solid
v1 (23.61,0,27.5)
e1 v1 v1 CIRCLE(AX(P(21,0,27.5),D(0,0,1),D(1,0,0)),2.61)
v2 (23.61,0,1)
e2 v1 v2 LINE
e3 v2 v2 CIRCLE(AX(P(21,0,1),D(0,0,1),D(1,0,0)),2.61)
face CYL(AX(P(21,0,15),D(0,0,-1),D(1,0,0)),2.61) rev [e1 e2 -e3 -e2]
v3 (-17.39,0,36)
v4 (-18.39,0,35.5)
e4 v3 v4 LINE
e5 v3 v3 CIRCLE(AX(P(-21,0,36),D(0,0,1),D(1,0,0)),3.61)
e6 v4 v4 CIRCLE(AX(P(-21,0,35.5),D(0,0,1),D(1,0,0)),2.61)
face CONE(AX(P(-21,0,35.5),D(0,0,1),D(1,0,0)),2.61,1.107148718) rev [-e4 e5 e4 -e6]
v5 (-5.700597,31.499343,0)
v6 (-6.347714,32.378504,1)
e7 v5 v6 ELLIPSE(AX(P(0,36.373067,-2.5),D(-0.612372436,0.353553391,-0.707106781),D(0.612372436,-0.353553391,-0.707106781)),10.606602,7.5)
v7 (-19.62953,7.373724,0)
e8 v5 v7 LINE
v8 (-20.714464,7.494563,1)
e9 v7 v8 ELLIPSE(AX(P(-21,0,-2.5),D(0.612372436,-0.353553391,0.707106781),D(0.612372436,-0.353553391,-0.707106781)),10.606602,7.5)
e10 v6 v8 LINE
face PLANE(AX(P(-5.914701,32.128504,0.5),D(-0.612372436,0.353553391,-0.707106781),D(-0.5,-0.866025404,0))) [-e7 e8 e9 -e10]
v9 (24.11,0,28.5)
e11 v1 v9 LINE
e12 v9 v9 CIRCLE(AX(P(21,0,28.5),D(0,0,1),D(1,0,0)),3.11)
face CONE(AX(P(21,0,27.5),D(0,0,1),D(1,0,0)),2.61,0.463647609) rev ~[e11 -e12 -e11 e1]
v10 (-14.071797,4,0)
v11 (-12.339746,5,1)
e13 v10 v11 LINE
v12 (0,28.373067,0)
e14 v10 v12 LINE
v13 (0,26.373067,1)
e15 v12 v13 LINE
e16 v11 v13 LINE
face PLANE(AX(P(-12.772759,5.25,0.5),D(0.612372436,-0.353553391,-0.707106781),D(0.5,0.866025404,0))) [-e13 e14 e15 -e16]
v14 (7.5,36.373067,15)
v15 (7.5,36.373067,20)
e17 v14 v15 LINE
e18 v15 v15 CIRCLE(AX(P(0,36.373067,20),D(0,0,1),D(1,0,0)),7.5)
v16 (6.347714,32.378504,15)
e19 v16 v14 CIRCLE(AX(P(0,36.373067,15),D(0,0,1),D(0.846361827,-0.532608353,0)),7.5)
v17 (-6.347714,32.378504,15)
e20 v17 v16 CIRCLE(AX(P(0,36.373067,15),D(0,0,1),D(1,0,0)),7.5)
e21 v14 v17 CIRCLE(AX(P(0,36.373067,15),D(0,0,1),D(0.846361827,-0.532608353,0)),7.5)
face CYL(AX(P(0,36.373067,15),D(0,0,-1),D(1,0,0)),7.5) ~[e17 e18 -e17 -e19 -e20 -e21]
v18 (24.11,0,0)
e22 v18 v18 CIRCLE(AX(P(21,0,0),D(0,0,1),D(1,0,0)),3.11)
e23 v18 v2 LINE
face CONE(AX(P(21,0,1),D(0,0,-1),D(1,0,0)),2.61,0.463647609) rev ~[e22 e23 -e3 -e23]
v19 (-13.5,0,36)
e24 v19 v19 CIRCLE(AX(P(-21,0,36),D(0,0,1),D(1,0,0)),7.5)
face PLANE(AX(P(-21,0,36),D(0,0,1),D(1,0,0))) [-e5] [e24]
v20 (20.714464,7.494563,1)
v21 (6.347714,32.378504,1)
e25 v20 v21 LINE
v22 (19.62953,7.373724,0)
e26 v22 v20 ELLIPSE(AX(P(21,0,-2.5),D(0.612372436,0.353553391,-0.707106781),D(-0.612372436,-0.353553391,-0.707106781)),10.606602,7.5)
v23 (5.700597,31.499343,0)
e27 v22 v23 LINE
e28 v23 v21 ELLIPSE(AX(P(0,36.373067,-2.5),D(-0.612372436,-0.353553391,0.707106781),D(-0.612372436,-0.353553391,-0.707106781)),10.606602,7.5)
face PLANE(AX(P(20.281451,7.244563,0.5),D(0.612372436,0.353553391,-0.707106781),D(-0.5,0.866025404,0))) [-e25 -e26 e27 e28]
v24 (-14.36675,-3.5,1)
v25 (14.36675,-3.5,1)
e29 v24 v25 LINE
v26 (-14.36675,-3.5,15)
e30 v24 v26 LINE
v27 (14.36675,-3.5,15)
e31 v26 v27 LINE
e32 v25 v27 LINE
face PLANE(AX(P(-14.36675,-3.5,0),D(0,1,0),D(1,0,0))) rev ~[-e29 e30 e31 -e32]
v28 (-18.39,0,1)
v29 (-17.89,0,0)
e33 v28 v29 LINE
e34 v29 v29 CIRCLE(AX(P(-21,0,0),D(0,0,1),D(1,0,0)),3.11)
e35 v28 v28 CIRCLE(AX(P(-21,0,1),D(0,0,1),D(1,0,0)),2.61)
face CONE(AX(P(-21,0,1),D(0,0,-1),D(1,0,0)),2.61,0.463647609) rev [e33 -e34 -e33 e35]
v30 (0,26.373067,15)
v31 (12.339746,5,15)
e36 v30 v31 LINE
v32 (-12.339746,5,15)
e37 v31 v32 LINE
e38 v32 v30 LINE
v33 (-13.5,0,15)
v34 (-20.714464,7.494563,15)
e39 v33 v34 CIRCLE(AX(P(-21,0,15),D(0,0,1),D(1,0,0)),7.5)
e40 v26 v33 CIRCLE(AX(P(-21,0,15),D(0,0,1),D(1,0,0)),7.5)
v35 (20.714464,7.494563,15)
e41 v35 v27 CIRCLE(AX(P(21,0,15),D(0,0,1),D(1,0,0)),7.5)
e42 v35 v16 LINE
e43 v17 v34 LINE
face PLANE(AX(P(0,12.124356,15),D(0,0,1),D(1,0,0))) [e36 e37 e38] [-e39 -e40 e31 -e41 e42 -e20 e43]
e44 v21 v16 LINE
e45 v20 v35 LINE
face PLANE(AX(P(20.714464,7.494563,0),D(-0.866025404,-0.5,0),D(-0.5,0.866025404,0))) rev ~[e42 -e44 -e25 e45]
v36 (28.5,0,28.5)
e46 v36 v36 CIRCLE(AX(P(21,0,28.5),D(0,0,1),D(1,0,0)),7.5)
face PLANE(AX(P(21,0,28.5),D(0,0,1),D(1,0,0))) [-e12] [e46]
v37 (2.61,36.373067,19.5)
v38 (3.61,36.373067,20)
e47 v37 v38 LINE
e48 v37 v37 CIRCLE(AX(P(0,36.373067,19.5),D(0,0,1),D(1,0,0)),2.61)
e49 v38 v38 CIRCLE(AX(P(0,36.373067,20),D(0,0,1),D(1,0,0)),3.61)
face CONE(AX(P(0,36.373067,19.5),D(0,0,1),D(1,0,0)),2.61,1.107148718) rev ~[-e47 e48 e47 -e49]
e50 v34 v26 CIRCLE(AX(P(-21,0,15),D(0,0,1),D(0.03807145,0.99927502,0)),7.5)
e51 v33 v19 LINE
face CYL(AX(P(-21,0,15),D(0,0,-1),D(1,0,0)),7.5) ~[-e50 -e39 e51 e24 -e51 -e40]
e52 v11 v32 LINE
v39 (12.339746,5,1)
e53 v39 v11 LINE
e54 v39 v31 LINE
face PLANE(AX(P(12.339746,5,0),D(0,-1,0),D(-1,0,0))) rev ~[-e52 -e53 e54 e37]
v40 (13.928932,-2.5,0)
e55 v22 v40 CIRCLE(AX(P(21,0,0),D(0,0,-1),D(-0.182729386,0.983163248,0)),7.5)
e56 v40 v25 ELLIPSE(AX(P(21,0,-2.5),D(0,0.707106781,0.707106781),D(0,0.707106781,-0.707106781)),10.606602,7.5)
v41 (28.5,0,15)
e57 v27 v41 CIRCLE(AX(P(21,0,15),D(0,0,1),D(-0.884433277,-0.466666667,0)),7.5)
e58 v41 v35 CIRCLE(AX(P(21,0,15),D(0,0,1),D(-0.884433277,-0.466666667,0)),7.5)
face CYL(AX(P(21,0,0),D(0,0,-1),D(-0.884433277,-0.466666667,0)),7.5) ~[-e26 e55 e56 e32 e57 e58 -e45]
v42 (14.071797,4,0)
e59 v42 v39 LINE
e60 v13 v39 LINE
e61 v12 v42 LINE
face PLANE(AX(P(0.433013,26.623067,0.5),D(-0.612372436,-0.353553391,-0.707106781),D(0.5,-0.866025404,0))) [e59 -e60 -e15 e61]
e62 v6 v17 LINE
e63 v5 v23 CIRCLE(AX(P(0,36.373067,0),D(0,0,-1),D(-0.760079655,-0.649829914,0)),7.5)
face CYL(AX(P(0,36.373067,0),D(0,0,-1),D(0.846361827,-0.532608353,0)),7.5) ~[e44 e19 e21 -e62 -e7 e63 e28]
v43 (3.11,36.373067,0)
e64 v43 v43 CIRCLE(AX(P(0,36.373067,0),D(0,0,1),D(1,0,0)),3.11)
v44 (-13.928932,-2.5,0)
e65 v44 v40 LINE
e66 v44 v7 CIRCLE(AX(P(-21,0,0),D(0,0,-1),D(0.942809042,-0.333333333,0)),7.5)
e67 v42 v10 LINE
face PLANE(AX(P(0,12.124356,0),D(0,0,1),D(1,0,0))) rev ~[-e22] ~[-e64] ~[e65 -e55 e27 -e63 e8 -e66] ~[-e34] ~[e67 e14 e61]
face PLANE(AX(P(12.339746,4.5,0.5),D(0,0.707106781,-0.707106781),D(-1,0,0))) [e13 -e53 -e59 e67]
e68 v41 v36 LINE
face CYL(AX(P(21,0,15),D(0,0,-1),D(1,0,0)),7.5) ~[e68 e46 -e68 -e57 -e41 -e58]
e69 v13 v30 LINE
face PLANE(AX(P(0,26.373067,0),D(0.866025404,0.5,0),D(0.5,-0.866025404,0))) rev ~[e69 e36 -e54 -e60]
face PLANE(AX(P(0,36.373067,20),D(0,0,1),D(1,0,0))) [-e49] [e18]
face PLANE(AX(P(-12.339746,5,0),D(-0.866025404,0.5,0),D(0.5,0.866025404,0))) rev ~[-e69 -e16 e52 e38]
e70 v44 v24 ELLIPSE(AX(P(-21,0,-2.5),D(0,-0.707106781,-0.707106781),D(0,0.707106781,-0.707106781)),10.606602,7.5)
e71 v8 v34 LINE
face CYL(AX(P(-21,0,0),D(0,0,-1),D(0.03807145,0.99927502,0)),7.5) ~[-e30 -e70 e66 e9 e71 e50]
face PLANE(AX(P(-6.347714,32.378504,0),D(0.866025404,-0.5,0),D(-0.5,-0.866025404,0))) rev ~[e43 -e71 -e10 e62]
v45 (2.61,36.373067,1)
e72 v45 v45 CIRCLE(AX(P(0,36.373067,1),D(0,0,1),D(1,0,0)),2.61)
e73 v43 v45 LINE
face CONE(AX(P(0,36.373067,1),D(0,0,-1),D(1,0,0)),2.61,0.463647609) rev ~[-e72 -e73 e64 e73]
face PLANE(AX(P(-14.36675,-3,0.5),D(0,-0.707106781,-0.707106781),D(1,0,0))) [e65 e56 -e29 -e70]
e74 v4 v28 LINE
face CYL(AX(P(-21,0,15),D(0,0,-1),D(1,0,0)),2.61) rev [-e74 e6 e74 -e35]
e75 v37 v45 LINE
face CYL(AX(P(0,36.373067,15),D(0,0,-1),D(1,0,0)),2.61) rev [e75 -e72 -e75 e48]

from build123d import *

# Parameters (mm, degrees)
F0_R        = 2.61
F1_DEPTH    = 15
F2_R        = 7.5
F2_R_2      = 2.61
F3_DEPTH    = 5
F4_R        = 7.5
F4_R_2      = 2.61
F5_DEPTH    = 13.5
F6_R        = 7.5
F6_R_2      = 2.61
F7_DEPTH    = 21
F8_C1_SIZE2 = 0.5
F8_C1_SIZE  = 1
F8_C2_SIZE2 = 0.5
F8_C2_SIZE  = 1
F8_C3_SIZE2 = 1
F8_C3_SIZE  = 0.5
F8_C4_SIZE2 = 1
F8_C4_SIZE  = 0.5
F8_C5_SIZE2 = 1
F8_C5_SIZE  = 0.5
F8_C6_SIZE2 = 0.5
F8_C6_SIZE  = 1
F9_SIZE     = 1


with BuildPart() as f1:
    # F0 (on Top) → F1 (new body)
    with BuildSketch(Plane.XY):
        with BuildLine():
            Line((20.7144641229, 7.4945626465), (6.3477137036, 32.3785043124))
            ThreePointArc((6.3477137036, 32.3785043124), (0, 43.8730669589), (-6.3477137036, 32.3785043124))
            Line((-6.3477137036, 32.3785043124), (-20.7144641229, 7.4945626465))
            ThreePointArc((-20.7144641229, 7.4945626465), (-27.4951905284, -3.75), (-14.3667504193, -3.5))
            Line((-14.3667504193, -3.5), (14.3667504193, -3.5))
            ThreePointArc((14.3667504193, -3.5), (27.4951905284, -3.75), (20.7144641229, 7.4945626465))
        make_face()
        with Locations((-21, 0)):
            Circle(F0_R, mode=Mode.SUBTRACT)
        with Locations((21, 0)):
            Circle(F0_R, mode=Mode.SUBTRACT)
        Polygon((12.3397459622, 5), (-12.3397459622, 5), (0, 26.3730669589), align=None, mode=Mode.SUBTRACT)
        with Locations((0, 36.3730669589)):
            Circle(F0_R, mode=Mode.SUBTRACT)
    extrude(amount=F1_DEPTH)

    # F2 (on face) → F3 (join)
    with BuildSketch(Plane.XY.offset(15)):
        with Locations((0, 36.3730669589)):
            Circle(F2_R)
        with Locations((0, 36.3730669589)):
            Circle(F2_R_2, mode=Mode.SUBTRACT)
    extrude(amount=F3_DEPTH)

    # F4 (on face) → F5 (join)
    with BuildSketch(Plane.XY.offset(15)):
        with Locations((21, 0)):
            Circle(F4_R)
        with Locations((21, 0)):
            Circle(F4_R_2, mode=Mode.SUBTRACT)
    extrude(amount=F5_DEPTH)

    # F6 (on face) → F7 (join)
    with BuildSketch(Plane.XY.offset(15)):
        with Locations((-21, 0)):
            Circle(F6_R)
        with Locations((-21, 0)):
            Circle(F6_R_2, mode=Mode.SUBTRACT)
    extrude(amount=F7_DEPTH)

    # F8: chamfer of 0.5 x 1 on 6 edges, made by hand

    # F8_c1
    f8_c1_edges = [f1.edges().sort_by_distance(p)[0] for p in [
        (-23.61, 0, 36),
    ]]
    f8_c1_side = f1.faces().sort_by_distance((-23.62, 0, 36))[0]
    chamfer(f8_c1_edges, length=F8_C1_SIZE, length2=F8_C1_SIZE2, reference=f8_c1_side)

    # F8_c2
    f8_c2_edges = [f1.edges().sort_by_distance(p)[0] for p in [
        (-23.61, 0, 0),
    ]]
    f8_c2_side = f1.faces().sort_by_distance((-23.61, 0, 0.01))[0]
    chamfer(f8_c2_edges, length=F8_C2_SIZE, length2=F8_C2_SIZE2, reference=f8_c2_side)

    # F8_c3
    f8_c3_edges = [f1.edges().sort_by_distance(p)[0] for p in [
        (18.39, 0, 0),
    ]]
    f8_c3_side = f1.faces().sort_by_distance((18.38, 0, 0))[0]
    chamfer(f8_c3_edges, length=F8_C3_SIZE, length2=F8_C3_SIZE2, reference=f8_c3_side)

    # F8_c4
    f8_c4_edges = [f1.edges().sort_by_distance(p)[0] for p in [
        (-2.61, 36.3730669589, 0),
    ]]
    f8_c4_side = f1.faces().sort_by_distance((-2.62, 36.3730669589, 0))[0]
    chamfer(f8_c4_edges, length=F8_C4_SIZE, length2=F8_C4_SIZE2, reference=f8_c4_side)

    # F8_c5
    f8_c5_edges = [f1.edges().sort_by_distance(p)[0] for p in [
        (-2.61, 36.3730669589, 20),
    ]]
    f8_c5_side = f1.faces().sort_by_distance((-2.61, 36.3730669589, 19.99))[0]
    chamfer(f8_c5_edges, length=F8_C5_SIZE, length2=F8_C5_SIZE2, reference=f8_c5_side)

    # F8_c6
    f8_c6_edges = [f1.edges().sort_by_distance(p)[0] for p in [
        (18.39, 0, 28.5),
    ]]
    f8_c6_side = f1.faces().sort_by_distance((18.39, 0, 28.49))[0]
    chamfer(f8_c6_edges, length=F8_C6_SIZE, length2=F8_C6_SIZE2, reference=f8_c6_side)

    # F9
    f9_edges = [f1.edges().sort_by_distance(p)[0] for p in [
        (6.169873, 15.686533, 0),
        (0, 5, 0),
        (-6.169873, 15.686533, 0),
        (0, -3.5, 0),
        (-13.531089, 19.936533, 0),
        (13.531089, 19.936533, 0),
    ]]
    chamfer(f9_edges, length=F9_SIZE)


solid = f1.part
